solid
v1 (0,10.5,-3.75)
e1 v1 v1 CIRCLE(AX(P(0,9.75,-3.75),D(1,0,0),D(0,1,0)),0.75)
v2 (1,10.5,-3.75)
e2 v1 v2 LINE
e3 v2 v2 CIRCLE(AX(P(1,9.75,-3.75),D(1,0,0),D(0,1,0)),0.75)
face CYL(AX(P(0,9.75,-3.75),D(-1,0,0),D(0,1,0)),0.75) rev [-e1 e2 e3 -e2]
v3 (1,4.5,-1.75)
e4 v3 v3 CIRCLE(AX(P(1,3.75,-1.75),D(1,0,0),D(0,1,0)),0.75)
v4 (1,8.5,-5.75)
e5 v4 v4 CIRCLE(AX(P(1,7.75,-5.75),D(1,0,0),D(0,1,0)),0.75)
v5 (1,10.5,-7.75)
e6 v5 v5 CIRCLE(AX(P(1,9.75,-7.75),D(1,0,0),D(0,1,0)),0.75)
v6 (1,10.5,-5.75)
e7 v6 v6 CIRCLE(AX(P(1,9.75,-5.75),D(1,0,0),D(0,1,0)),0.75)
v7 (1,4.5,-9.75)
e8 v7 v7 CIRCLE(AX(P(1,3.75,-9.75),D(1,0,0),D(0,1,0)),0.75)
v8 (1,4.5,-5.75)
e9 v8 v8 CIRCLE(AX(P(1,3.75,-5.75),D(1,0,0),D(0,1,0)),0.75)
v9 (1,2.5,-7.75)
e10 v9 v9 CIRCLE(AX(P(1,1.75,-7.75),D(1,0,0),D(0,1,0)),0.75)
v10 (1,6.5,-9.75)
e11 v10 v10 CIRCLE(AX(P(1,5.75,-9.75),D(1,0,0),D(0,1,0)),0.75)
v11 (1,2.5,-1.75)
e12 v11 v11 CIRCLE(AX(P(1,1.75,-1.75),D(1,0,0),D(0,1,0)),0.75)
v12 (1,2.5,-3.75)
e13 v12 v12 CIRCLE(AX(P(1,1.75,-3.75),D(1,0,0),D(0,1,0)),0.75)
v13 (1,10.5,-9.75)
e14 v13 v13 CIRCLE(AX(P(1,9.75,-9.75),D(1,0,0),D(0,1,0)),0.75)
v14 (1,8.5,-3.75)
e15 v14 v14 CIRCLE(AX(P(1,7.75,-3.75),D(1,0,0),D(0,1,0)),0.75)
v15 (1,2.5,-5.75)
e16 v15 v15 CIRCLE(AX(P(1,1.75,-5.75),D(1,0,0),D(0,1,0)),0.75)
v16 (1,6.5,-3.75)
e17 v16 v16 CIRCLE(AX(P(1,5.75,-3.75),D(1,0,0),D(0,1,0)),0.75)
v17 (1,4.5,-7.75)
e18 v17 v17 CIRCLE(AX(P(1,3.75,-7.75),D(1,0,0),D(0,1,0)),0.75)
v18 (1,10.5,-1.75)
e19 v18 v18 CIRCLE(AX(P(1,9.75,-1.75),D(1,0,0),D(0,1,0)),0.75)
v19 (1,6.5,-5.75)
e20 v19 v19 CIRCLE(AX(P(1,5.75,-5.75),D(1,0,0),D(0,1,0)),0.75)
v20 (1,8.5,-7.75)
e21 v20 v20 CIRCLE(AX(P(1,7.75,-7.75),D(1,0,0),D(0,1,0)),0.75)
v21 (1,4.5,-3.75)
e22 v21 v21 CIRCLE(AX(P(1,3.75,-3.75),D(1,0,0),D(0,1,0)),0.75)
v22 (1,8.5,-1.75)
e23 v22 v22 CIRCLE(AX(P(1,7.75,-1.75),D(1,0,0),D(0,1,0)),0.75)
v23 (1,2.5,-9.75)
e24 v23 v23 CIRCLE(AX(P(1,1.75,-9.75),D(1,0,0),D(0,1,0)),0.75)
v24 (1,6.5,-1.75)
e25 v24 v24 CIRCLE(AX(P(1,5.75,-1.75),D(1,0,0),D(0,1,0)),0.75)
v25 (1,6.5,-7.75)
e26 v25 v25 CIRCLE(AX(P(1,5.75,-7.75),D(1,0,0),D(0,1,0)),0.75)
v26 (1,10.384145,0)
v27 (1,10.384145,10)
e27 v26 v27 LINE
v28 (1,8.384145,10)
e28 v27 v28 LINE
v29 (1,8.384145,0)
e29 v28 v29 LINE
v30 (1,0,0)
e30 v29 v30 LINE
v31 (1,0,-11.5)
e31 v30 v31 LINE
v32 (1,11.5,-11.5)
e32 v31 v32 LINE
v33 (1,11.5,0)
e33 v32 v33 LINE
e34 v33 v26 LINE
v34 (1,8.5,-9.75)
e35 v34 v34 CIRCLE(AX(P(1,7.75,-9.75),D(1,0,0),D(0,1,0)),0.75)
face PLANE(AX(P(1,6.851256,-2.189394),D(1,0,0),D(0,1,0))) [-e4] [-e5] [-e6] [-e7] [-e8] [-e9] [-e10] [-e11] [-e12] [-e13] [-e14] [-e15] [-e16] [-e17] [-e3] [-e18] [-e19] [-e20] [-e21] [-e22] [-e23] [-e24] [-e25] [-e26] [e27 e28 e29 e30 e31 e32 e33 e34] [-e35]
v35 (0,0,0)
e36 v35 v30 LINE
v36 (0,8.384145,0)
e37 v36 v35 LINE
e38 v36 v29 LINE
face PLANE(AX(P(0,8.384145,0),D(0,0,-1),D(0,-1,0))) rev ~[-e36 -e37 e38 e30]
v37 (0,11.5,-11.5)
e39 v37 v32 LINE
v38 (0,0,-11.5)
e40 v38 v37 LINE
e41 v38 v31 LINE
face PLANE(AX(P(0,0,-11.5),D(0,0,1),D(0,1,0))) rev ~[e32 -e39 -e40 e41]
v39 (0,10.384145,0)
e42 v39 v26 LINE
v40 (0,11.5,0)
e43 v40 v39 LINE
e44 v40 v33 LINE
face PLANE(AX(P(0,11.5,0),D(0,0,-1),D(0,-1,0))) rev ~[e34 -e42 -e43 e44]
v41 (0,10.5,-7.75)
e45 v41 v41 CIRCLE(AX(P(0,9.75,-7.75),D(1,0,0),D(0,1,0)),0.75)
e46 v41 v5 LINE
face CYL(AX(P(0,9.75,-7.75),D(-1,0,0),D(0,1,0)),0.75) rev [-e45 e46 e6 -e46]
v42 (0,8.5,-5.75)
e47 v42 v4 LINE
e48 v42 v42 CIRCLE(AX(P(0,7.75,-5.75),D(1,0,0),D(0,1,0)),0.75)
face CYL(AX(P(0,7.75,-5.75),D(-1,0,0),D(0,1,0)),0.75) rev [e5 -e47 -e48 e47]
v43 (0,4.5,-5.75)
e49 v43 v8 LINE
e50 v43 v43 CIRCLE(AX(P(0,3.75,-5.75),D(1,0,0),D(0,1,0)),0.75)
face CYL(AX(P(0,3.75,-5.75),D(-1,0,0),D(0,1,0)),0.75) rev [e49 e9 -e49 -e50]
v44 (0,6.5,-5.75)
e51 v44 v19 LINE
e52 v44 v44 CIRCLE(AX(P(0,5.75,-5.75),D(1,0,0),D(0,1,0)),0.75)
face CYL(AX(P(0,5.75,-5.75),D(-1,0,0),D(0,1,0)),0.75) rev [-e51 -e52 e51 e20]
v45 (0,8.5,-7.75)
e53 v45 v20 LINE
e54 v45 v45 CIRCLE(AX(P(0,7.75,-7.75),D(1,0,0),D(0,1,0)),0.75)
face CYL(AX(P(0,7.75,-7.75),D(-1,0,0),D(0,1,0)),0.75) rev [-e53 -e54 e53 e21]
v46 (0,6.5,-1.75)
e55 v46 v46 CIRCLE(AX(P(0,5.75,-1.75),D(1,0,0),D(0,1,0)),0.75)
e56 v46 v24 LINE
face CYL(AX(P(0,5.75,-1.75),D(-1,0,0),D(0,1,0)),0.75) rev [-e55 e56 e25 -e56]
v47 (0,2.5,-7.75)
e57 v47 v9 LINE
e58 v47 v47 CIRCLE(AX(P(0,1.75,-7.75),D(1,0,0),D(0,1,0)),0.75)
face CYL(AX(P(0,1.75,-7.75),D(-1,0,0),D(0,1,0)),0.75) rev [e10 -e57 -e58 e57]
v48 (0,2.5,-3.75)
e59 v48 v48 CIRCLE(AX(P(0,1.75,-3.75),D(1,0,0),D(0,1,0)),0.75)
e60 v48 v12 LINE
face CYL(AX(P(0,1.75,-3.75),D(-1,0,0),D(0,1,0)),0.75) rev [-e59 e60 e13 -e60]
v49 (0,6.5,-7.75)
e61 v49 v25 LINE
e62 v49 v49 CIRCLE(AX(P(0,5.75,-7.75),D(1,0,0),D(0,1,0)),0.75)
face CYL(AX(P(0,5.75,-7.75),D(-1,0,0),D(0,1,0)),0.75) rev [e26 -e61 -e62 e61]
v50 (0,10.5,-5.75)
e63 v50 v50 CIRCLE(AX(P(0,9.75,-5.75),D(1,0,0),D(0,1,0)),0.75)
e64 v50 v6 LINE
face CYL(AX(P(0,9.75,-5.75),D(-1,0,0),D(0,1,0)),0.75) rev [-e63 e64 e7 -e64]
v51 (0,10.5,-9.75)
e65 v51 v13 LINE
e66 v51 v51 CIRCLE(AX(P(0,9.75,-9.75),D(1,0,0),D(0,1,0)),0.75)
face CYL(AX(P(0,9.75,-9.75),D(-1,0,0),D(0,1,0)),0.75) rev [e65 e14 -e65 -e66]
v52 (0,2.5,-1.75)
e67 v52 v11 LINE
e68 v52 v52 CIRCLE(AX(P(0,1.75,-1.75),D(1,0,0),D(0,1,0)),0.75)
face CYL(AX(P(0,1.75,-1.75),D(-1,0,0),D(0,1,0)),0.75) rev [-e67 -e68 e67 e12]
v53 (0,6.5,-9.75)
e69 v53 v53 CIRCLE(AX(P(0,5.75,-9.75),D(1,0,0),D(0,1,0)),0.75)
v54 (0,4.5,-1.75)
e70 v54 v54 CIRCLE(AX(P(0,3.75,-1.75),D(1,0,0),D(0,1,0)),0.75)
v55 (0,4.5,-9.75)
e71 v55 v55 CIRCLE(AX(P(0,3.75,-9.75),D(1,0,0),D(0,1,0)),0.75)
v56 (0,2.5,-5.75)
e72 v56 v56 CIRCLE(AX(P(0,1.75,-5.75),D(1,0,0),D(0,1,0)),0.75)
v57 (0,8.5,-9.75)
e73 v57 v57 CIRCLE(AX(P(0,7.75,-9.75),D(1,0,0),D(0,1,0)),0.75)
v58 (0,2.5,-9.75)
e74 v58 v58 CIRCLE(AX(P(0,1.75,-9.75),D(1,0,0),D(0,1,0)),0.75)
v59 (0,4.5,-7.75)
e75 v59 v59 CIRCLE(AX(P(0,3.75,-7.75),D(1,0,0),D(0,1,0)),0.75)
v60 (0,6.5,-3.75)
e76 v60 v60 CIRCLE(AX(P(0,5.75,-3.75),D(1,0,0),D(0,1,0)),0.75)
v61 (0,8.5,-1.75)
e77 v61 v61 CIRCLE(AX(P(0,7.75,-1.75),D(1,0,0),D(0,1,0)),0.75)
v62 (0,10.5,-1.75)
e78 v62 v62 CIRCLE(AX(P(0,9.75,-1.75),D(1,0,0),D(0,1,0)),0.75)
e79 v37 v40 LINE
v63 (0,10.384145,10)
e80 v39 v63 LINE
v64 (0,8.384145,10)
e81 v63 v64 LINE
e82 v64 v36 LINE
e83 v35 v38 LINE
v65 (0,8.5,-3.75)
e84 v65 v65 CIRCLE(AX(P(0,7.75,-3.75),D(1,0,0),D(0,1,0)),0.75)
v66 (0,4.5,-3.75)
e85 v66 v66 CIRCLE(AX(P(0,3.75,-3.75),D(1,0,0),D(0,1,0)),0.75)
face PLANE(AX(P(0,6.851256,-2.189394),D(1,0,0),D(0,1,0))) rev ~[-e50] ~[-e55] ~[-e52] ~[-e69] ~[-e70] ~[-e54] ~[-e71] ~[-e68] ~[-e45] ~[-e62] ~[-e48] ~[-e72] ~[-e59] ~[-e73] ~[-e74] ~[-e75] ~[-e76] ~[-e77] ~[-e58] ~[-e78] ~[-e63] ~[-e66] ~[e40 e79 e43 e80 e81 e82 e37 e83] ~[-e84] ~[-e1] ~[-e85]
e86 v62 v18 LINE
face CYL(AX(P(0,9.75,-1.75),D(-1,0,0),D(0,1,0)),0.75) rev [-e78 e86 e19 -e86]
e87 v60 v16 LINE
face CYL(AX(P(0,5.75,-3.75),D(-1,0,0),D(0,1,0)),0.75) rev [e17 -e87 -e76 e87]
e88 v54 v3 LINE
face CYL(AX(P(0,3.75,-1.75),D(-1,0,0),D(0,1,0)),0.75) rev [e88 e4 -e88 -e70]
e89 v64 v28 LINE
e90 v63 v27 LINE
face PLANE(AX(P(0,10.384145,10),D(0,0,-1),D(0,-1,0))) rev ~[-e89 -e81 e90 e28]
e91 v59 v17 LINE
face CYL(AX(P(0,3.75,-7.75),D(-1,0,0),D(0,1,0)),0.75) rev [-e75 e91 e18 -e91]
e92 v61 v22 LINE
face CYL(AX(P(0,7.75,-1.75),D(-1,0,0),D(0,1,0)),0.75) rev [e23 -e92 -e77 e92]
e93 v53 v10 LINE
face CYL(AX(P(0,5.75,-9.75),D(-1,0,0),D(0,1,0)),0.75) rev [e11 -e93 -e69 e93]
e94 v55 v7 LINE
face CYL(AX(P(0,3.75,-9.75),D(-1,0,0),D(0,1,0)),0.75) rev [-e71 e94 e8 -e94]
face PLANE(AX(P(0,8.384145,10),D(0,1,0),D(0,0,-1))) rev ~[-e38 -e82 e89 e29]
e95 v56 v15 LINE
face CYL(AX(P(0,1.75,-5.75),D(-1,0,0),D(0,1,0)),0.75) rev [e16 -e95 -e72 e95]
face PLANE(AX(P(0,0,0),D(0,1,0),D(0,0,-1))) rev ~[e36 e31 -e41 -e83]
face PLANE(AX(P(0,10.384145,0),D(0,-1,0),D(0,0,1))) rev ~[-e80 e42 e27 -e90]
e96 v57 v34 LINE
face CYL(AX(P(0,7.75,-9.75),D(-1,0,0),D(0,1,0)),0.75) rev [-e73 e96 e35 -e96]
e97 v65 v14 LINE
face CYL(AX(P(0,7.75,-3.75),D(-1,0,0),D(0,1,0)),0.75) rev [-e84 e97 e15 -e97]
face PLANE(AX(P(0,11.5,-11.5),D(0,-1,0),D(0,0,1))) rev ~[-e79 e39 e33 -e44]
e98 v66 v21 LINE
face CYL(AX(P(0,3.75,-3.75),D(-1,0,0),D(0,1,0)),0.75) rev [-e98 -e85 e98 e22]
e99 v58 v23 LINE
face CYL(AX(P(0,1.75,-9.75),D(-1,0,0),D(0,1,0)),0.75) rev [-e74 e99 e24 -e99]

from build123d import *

# Parameters (mm, degrees)
F0_R     = 0.75
F1_DEPTH = 1


# Not quite as in the source:
# - a feature names something its author has since deleted; it is built from what else it names


with BuildPart() as f1:
    # F0 (on Right) → F1 (new body)
    with BuildSketch(Plane.YZ):
        Polygon((8.384144865, 0), (0, 0), (0, -11.5), (11.5, -11.5), (11.5, 0), (10.384144865, 0), (10.384144865, 10), (8.384144865, 10), align=None)
        with Locations((1.75, -9.75)):
            Circle(F0_R, mode=Mode.SUBTRACT)
        with Locations((1.75, -7.75)):
            Circle(F0_R, mode=Mode.SUBTRACT)
        with Locations((3.75, -9.75)):
            Circle(F0_R, mode=Mode.SUBTRACT)
        with Locations((3.75, -7.75)):
            Circle(F0_R, mode=Mode.SUBTRACT)
        with Locations((1.75, -5.75)):
            Circle(F0_R, mode=Mode.SUBTRACT)
        with Locations((1.75, -3.75)):
            Circle(F0_R, mode=Mode.SUBTRACT)
        with Locations((1.75, -1.75)):
            Circle(F0_R, mode=Mode.SUBTRACT)
        with Locations((3.75, -5.75)):
            Circle(F0_R, mode=Mode.SUBTRACT)
        with Locations((3.75, -3.75)):
            Circle(F0_R, mode=Mode.SUBTRACT)
        with Locations((3.75, -1.75)):
            Circle(F0_R, mode=Mode.SUBTRACT)
        with Locations((5.75, -9.75)):
            Circle(F0_R, mode=Mode.SUBTRACT)
        with Locations((7.75, -9.75)):
            Circle(F0_R, mode=Mode.SUBTRACT)
        with Locations((5.75, -7.75)):
            Circle(F0_R, mode=Mode.SUBTRACT)
        with Locations((7.75, -7.75)):
            Circle(F0_R, mode=Mode.SUBTRACT)
        with Locations((9.75, -9.75)):
            Circle(F0_R, mode=Mode.SUBTRACT)
        with Locations((9.75, -7.75)):
            Circle(F0_R, mode=Mode.SUBTRACT)
        with Locations((5.75, -5.75)):
            Circle(F0_R, mode=Mode.SUBTRACT)
        with Locations((5.75, -3.75)):
            Circle(F0_R, mode=Mode.SUBTRACT)
        with Locations((7.75, -5.75)):
            Circle(F0_R, mode=Mode.SUBTRACT)
        with Locations((7.75, -3.75)):
            Circle(F0_R, mode=Mode.SUBTRACT)
        with Locations((5.75, -1.75)):
            Circle(F0_R, mode=Mode.SUBTRACT)
        with Locations((7.75, -1.75)):
            Circle(F0_R, mode=Mode.SUBTRACT)
        with Locations((9.75, -5.75)):
            Circle(F0_R, mode=Mode.SUBTRACT)
        with Locations((9.75, -3.75)):
            Circle(F0_R, mode=Mode.SUBTRACT)
        with Locations((9.75, -1.75)):
            Circle(F0_R, mode=Mode.SUBTRACT)
    extrude(amount=F1_DEPTH)


solid = f1.part
